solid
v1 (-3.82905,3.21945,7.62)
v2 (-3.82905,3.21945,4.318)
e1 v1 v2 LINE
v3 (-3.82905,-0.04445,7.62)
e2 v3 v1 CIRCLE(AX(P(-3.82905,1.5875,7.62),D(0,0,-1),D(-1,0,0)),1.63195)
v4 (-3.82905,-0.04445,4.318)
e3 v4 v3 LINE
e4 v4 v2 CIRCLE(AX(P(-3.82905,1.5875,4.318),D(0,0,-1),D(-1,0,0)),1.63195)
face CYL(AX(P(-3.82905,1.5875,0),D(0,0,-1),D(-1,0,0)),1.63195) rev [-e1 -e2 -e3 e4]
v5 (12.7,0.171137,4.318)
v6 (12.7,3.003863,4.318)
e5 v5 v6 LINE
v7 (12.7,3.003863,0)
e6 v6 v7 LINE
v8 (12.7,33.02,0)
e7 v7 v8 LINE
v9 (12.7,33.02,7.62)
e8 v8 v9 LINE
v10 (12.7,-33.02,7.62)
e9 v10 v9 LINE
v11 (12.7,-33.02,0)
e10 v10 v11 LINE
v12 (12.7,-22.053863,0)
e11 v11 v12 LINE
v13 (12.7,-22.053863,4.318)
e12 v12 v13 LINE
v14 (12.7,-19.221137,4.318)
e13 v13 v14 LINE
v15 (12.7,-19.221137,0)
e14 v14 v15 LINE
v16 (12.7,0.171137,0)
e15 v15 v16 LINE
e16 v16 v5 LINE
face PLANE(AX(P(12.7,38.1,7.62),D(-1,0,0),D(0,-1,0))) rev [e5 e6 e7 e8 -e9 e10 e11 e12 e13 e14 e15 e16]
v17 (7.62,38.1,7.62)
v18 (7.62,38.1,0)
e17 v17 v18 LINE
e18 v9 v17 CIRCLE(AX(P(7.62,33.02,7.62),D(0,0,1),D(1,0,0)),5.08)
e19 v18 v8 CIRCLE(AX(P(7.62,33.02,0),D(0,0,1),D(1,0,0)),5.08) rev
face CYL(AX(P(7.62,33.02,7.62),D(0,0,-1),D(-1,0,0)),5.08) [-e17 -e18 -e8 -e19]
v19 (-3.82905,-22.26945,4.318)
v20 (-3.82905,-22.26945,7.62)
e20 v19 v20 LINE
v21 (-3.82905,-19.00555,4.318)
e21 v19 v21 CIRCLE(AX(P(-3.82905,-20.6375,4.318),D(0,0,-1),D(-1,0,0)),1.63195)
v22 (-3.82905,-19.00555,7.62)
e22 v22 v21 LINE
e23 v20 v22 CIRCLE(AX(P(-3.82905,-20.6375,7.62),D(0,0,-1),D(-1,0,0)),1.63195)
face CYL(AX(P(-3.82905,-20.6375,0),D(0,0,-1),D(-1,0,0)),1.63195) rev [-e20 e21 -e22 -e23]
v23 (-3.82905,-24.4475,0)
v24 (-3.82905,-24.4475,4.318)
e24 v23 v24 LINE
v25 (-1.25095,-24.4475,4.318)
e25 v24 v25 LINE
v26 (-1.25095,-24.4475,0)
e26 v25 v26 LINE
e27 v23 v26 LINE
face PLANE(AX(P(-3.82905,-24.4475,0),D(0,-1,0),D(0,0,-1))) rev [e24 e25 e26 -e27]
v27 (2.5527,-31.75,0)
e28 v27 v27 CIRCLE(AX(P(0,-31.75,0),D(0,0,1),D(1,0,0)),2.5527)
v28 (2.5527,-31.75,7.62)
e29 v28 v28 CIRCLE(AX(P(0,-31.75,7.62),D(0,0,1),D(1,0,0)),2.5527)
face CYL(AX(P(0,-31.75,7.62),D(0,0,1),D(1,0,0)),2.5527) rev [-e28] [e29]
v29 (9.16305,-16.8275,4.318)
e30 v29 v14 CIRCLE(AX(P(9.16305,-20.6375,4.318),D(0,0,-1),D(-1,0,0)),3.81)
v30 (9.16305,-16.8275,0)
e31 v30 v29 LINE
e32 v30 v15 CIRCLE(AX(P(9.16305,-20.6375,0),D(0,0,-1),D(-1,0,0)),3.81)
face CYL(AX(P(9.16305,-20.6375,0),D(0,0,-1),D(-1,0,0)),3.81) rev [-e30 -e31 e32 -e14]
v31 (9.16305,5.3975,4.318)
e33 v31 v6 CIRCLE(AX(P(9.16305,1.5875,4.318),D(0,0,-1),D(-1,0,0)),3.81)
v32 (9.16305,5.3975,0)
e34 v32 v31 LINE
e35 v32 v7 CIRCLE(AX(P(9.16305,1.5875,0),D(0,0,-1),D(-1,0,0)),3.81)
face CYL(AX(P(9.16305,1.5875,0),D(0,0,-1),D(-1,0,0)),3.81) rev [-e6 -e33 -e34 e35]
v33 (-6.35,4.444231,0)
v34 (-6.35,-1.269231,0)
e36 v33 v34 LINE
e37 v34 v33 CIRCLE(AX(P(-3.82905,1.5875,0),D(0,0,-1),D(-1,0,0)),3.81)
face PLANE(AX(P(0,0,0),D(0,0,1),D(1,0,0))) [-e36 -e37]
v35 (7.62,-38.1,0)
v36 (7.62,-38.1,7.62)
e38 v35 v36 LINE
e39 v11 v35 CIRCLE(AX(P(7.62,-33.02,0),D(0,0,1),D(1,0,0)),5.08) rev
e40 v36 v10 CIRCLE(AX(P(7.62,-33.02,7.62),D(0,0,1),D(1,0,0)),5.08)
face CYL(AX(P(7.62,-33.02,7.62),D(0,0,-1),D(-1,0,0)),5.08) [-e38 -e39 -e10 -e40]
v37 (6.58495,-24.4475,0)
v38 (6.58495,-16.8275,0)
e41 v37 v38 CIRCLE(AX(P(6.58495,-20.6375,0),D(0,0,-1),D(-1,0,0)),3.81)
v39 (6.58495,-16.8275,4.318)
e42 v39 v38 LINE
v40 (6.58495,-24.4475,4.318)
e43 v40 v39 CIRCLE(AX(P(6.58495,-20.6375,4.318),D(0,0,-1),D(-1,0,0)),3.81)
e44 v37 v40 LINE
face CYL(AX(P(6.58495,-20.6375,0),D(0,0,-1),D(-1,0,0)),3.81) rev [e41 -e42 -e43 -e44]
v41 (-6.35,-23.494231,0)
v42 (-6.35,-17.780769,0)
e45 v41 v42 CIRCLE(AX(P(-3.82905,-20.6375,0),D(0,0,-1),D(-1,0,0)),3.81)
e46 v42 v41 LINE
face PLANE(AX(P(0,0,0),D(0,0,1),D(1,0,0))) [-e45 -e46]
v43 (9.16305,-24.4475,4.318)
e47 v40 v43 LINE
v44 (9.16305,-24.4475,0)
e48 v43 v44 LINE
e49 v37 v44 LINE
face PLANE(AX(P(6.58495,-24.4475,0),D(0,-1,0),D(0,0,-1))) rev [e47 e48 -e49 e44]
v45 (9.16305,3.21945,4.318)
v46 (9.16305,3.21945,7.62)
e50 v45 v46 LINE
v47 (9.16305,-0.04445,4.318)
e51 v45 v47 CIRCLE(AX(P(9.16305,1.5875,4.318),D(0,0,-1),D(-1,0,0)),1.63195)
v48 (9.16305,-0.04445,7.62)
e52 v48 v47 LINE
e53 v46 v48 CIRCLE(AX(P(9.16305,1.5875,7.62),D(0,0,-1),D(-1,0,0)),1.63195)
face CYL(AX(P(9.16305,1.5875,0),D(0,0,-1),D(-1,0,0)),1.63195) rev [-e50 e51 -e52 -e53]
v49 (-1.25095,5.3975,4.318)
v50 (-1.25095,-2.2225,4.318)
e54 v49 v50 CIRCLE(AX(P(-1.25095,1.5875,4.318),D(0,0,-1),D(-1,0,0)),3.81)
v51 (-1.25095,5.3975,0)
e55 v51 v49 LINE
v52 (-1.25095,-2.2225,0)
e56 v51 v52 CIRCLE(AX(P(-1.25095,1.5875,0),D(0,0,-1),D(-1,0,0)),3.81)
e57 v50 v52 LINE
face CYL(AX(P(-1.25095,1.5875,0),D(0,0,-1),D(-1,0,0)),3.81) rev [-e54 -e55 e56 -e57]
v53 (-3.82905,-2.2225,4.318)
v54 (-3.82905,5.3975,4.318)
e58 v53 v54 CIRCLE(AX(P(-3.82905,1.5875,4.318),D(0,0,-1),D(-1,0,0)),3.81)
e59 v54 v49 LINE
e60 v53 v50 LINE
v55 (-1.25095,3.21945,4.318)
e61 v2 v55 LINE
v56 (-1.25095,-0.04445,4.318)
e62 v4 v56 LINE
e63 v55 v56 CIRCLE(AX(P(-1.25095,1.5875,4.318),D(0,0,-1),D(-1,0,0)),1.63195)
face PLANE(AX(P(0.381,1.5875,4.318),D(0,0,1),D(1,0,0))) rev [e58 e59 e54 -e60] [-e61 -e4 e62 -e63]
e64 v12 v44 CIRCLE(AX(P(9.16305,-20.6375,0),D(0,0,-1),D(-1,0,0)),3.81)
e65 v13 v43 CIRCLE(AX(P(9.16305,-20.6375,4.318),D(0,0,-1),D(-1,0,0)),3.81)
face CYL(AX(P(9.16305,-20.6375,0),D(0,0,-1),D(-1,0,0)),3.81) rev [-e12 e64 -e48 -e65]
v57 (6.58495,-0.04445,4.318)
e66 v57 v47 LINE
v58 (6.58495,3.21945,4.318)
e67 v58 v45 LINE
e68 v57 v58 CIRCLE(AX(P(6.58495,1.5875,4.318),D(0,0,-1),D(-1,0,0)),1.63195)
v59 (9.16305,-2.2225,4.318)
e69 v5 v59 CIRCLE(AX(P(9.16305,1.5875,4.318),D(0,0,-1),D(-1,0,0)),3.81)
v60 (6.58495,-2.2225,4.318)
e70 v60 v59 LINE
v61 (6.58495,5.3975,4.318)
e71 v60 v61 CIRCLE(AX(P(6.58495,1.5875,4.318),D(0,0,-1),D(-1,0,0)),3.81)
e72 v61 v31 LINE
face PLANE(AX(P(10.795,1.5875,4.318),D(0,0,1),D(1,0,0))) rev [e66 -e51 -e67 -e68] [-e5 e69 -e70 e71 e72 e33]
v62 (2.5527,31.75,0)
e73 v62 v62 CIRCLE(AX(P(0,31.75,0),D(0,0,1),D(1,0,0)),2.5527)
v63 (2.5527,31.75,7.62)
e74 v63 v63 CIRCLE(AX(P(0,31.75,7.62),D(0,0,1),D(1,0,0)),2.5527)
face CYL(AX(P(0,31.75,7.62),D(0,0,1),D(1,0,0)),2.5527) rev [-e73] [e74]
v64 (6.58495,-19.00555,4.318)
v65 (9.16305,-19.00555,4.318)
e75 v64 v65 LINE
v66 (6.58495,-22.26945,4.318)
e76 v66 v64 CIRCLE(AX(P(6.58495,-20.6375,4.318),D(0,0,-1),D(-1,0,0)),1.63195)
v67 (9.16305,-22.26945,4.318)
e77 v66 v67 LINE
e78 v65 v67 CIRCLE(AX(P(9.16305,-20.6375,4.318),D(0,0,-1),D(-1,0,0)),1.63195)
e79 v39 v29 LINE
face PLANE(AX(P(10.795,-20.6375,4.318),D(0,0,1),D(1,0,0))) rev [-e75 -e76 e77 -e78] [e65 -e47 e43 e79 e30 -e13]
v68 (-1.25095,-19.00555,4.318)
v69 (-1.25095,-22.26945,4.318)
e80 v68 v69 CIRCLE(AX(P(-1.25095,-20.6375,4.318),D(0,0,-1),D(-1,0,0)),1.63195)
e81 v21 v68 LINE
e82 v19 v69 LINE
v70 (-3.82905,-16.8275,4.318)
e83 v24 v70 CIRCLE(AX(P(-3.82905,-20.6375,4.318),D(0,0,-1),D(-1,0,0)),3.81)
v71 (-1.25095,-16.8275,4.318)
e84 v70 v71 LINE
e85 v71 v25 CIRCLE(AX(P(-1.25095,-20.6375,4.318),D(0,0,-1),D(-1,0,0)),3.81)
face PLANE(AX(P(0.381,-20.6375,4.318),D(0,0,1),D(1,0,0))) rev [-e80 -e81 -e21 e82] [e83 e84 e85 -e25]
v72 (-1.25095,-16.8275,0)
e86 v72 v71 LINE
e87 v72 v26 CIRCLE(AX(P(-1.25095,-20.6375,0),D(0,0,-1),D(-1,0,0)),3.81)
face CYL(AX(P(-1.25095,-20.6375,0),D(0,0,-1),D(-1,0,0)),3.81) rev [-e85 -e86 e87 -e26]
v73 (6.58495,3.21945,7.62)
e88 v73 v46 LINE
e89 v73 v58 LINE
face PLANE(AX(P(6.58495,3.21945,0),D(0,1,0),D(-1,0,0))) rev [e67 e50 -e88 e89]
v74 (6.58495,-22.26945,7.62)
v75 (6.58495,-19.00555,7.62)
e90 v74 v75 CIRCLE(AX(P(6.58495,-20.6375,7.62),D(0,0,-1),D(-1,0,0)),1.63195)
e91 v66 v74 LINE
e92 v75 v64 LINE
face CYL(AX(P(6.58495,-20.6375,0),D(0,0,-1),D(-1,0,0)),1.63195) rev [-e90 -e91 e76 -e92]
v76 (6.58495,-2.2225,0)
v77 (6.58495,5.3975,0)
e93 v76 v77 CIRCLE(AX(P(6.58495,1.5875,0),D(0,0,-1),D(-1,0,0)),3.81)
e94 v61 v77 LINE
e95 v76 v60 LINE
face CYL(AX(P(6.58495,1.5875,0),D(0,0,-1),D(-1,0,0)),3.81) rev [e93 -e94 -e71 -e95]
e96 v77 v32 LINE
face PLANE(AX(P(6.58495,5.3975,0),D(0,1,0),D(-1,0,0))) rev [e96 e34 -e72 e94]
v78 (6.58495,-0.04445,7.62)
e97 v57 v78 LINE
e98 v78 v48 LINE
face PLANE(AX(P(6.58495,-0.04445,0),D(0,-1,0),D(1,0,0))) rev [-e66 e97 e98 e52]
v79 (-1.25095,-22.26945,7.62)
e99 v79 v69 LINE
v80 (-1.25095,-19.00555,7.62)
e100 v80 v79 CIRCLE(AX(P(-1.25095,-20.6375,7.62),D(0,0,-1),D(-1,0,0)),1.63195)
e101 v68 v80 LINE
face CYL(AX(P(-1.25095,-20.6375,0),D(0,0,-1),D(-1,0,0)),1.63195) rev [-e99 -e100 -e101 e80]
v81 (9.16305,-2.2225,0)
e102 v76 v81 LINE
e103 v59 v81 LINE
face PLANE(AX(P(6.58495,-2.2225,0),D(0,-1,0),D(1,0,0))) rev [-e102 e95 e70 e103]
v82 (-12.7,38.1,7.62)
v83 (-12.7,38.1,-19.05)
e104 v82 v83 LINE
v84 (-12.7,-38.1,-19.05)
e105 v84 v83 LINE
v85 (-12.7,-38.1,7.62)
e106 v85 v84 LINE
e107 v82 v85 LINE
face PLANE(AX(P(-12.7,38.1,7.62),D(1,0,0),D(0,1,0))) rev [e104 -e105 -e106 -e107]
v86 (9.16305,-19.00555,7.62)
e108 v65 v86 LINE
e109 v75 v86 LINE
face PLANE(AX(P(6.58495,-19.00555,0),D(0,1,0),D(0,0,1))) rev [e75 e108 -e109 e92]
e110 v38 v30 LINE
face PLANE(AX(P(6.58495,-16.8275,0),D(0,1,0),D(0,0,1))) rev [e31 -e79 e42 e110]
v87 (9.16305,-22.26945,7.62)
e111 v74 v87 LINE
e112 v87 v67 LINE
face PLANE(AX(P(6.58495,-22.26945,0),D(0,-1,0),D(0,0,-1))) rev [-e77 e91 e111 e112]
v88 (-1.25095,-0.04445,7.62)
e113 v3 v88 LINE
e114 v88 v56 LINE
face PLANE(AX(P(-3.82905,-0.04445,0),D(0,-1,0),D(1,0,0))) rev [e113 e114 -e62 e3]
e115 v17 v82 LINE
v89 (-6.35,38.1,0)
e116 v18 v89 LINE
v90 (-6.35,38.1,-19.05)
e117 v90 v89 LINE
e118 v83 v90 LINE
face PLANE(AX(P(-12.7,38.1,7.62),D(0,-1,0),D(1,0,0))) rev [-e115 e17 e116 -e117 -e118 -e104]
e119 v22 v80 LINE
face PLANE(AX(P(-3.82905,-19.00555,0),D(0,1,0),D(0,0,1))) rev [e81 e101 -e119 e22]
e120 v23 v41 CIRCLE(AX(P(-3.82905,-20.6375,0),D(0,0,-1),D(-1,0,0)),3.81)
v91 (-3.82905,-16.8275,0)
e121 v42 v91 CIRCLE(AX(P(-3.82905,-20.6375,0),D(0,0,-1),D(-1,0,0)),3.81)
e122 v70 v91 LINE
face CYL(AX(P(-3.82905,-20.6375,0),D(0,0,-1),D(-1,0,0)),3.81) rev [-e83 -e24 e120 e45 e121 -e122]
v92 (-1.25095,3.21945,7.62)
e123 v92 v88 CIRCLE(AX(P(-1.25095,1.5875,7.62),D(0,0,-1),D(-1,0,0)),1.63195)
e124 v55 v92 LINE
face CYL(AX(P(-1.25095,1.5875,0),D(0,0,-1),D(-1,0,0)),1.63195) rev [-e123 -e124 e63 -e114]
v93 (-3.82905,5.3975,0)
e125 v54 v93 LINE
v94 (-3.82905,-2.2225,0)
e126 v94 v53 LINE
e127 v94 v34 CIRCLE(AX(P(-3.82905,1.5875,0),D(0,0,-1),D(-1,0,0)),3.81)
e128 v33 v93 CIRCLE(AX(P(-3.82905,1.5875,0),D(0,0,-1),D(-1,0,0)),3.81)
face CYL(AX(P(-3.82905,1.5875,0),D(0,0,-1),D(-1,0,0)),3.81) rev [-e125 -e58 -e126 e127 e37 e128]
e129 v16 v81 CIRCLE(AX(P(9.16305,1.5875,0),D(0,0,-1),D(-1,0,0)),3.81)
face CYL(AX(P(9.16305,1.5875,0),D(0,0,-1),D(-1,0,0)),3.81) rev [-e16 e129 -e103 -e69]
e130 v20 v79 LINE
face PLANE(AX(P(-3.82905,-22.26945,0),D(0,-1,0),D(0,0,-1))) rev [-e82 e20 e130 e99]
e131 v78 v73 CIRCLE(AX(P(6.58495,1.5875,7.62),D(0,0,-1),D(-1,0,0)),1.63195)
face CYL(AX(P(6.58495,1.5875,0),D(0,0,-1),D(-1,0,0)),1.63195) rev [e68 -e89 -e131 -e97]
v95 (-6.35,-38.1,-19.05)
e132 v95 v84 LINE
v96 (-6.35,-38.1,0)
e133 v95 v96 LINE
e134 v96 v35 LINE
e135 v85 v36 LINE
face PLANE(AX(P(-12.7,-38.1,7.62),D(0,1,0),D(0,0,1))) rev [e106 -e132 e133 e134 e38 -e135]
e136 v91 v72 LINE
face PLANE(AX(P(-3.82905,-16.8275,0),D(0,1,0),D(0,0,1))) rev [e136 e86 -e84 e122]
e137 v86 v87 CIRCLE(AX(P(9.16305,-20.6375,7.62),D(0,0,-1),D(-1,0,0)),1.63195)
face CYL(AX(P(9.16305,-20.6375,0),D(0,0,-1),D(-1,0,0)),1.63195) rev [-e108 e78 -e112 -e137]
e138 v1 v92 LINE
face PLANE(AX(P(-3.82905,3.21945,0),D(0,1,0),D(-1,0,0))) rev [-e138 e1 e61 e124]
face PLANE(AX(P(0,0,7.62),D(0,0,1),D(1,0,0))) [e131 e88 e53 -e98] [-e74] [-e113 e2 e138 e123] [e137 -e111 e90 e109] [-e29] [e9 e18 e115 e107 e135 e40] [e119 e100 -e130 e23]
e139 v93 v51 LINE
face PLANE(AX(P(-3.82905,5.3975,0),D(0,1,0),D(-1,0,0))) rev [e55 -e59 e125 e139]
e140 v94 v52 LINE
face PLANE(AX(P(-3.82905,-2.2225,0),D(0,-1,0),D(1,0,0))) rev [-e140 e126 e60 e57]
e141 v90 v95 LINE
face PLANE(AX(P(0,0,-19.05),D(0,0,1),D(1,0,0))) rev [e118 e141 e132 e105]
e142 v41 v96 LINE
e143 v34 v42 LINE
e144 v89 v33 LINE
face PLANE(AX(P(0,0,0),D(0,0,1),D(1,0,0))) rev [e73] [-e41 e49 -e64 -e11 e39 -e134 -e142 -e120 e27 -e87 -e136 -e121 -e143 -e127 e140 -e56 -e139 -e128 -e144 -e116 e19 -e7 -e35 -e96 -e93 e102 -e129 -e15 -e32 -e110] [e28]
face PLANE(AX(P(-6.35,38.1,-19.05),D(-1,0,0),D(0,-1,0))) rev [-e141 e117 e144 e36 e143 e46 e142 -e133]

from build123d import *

# Parameters (mm, degrees)
SKETCH1_W                                     = 25.4
SKETCH1_H                                     = 76.2
BOSS_EXTRUDE1_DEPTH                           = 7.62
F_10_CLEARANCE_HOLE1_D                        = 5.1054
F_10_CLEARANCE_HOLE1_DEPTH                    = 25.4
F_10_CLEARANCE_HOLE1_TIP                      = 1.533816902
CBORE_SLOT_FOR_4_SOCKET_HEAD_CAP_SCREW1_DEPTH = 4.318
CBORE_START                                   = 4.318
CBORE_SLOT_FOR_4_SOCKET_HEAD_CAP_SC_3_DEPTH   = 3.302
FILLET1_R                                     = 5.08
SKETCH8_W                                     = 6.35
SKETCH8_H                                     = 76.2
BOSS_EXTRUDE2_DEPTH                           = 19.05


# Read off the part's stored shape, not the designer's step: CBORE SLOT for #4 Socket Head Cap Screw1
with BuildPart() as part:
    # Sketch1 → Boss-Extrude1 (new body)
    with BuildSketch(Plane.XY):
        Rectangle(SKETCH1_W, SKETCH1_H)
    extrude(amount=BOSS_EXTRUDE1_DEPTH)

    # #10 Clearance Hole1
    with Locations(Plane.XY.offset(7.62)):
        with Locations((0, 31.75), (0, -31.75)):
            Hole(F_10_CLEARANCE_HOLE1_D / 2, depth=F_10_CLEARANCE_HOLE1_DEPTH)
            with Locations((0, 0, -(F_10_CLEARANCE_HOLE1_DEPTH + F_10_CLEARANCE_HOLE1_TIP / 2))):  # 118° drill point
                Cone(0, F_10_CLEARANCE_HOLE1_D / 2, F_10_CLEARANCE_HOLE1_TIP, mode=Mode.SUBTRACT)

    # CBORE SLOT for _4 Socket Head Cap Sc 2 → CBORE SLOT for #4 Socket Head Cap Screw1 (cut)
    with BuildSketch(Plane.XY):
        with BuildLine():
            Line((12.7, -22.053863194), (12.7, -19.221136806))
            ThreePointArc((12.7, -19.221136806), (11.298437111, -17.48215186), (9.16305, -16.8275))
            Line((9.16305, -16.8275), (6.58495, -16.8275))
            ThreePointArc((6.58495, -16.8275), (2.77495, -20.6375), (6.58495, -24.4475))
            Line((6.58495, -24.4475), (9.16305, -24.4475))
            ThreePointArc((9.16305, -24.4475), (11.298437111, -23.79284814), (12.7, -22.053863194))
        make_face()
        with BuildLine():
            ThreePointArc((12.7, 3.003863194), (11.298437111, 4.74284814), (9.16305, 5.3975))
            Line((9.16305, 5.3975), (6.58495, 5.3975))
            ThreePointArc((6.58495, 5.3975), (2.77495, 1.5875), (6.58495, -2.2225))
            Line((6.58495, -2.2225), (9.16305, -2.2225))
            ThreePointArc((9.16305, -2.2225), (11.298437111, -1.56784814), (12.7, 0.171136806))
            Line((12.7, 0.171136806), (12.7, 3.003863194))
        make_face()
        with BuildLine():
            ThreePointArc((-3.82905, 5.3975), (-7.63905, 1.5875), (-3.82905, -2.2225))
            Line((-3.82905, -2.2225), (-1.25095, -2.2225))
            ThreePointArc((-1.25095, -2.2225), (2.55905, 1.5875), (-1.25095, 5.3975))
            Line((-1.25095, 5.3975), (-3.82905, 5.3975))
        make_face()
        with BuildLine():
            ThreePointArc((-3.82905, -16.8275), (-7.63905, -20.6375), (-3.82905, -24.4475))
            Line((-3.82905, -24.4475), (-1.25095, -24.4475))
            ThreePointArc((-1.25095, -24.4475), (2.55905, -20.6375), (-1.25095, -16.8275))
            Line((-1.25095, -16.8275), (-3.82905, -16.8275))
        make_face()
    extrude(amount=CBORE_SLOT_FOR_4_SOCKET_HEAD_CAP_SCREW1_DEPTH, mode=Mode.SUBTRACT)

    # CBORE SLOT for _4 Socket Head Cap Sc 3 o → CBORE SLOT for _4 Socket Head Cap Sc 3 (cut)
    with BuildSketch(Plane.XY.offset(CBORE_START)):
        with BuildLine():
            ThreePointArc((9.16305, -0.04445), (10.795, 1.5875), (9.16305, 3.21945))
            Line((9.16305, 3.21945), (6.58495, 3.21945))
            ThreePointArc((6.58495, 3.21945), (4.953, 1.5875), (6.58495, -0.04445))
            Line((6.58495, -0.04445), (9.16305, -0.04445))
        make_face()
        with BuildLine():
            ThreePointArc((-3.82905, 3.21945), (-5.461, 1.5875), (-3.82905, -0.04445))
            Line((-3.82905, -0.04445), (-1.25095, -0.04445))
            ThreePointArc((-1.25095, -0.04445), (0.381, 1.5875), (-1.25095, 3.21945))
            Line((-1.25095, 3.21945), (-3.82905, 3.21945))
        make_face()
        with BuildLine():
            ThreePointArc((9.16305, -22.26945), (10.795, -20.6375), (9.16305, -19.00555))
            Line((9.16305, -19.00555), (6.58495, -19.00555))
            ThreePointArc((6.58495, -19.00555), (4.953, -20.6375), (6.58495, -22.26945))
            Line((6.58495, -22.26945), (9.16305, -22.26945))
        make_face()
        with BuildLine():
            ThreePointArc((-3.82905, -19.00555), (-5.461, -20.6375), (-3.82905, -22.26945))
            Line((-3.82905, -22.26945), (-1.25095, -22.26945))
            ThreePointArc((-1.25095, -22.26945), (0.381, -20.6375), (-1.25095, -19.00555))
            Line((-1.25095, -19.00555), (-3.82905, -19.00555))
        make_face()
    extrude(amount=CBORE_SLOT_FOR_4_SOCKET_HEAD_CAP_SC_3_DEPTH, mode=Mode.SUBTRACT)

    # Fillet1
    fillet1_edges = [part.edges().sort_by_distance(p)[0] for p in [
        (12.7, 38.1, 3.81),
        (12.7, -38.1, 3.81),
    ]]
    fillet(fillet1_edges, radius=FILLET1_R)

    # Sketch8 → Boss-Extrude2 (add)
    with BuildSketch(Plane(origin=(0, 0, 0), x_dir=(-1, 0, 0), z_dir=(0, 0, -1))):
        with Locations((9.525, 0)):
            Rectangle(SKETCH8_W, SKETCH8_H)
    extrude(amount=BOSS_EXTRUDE2_DEPTH)


solid = part.part
